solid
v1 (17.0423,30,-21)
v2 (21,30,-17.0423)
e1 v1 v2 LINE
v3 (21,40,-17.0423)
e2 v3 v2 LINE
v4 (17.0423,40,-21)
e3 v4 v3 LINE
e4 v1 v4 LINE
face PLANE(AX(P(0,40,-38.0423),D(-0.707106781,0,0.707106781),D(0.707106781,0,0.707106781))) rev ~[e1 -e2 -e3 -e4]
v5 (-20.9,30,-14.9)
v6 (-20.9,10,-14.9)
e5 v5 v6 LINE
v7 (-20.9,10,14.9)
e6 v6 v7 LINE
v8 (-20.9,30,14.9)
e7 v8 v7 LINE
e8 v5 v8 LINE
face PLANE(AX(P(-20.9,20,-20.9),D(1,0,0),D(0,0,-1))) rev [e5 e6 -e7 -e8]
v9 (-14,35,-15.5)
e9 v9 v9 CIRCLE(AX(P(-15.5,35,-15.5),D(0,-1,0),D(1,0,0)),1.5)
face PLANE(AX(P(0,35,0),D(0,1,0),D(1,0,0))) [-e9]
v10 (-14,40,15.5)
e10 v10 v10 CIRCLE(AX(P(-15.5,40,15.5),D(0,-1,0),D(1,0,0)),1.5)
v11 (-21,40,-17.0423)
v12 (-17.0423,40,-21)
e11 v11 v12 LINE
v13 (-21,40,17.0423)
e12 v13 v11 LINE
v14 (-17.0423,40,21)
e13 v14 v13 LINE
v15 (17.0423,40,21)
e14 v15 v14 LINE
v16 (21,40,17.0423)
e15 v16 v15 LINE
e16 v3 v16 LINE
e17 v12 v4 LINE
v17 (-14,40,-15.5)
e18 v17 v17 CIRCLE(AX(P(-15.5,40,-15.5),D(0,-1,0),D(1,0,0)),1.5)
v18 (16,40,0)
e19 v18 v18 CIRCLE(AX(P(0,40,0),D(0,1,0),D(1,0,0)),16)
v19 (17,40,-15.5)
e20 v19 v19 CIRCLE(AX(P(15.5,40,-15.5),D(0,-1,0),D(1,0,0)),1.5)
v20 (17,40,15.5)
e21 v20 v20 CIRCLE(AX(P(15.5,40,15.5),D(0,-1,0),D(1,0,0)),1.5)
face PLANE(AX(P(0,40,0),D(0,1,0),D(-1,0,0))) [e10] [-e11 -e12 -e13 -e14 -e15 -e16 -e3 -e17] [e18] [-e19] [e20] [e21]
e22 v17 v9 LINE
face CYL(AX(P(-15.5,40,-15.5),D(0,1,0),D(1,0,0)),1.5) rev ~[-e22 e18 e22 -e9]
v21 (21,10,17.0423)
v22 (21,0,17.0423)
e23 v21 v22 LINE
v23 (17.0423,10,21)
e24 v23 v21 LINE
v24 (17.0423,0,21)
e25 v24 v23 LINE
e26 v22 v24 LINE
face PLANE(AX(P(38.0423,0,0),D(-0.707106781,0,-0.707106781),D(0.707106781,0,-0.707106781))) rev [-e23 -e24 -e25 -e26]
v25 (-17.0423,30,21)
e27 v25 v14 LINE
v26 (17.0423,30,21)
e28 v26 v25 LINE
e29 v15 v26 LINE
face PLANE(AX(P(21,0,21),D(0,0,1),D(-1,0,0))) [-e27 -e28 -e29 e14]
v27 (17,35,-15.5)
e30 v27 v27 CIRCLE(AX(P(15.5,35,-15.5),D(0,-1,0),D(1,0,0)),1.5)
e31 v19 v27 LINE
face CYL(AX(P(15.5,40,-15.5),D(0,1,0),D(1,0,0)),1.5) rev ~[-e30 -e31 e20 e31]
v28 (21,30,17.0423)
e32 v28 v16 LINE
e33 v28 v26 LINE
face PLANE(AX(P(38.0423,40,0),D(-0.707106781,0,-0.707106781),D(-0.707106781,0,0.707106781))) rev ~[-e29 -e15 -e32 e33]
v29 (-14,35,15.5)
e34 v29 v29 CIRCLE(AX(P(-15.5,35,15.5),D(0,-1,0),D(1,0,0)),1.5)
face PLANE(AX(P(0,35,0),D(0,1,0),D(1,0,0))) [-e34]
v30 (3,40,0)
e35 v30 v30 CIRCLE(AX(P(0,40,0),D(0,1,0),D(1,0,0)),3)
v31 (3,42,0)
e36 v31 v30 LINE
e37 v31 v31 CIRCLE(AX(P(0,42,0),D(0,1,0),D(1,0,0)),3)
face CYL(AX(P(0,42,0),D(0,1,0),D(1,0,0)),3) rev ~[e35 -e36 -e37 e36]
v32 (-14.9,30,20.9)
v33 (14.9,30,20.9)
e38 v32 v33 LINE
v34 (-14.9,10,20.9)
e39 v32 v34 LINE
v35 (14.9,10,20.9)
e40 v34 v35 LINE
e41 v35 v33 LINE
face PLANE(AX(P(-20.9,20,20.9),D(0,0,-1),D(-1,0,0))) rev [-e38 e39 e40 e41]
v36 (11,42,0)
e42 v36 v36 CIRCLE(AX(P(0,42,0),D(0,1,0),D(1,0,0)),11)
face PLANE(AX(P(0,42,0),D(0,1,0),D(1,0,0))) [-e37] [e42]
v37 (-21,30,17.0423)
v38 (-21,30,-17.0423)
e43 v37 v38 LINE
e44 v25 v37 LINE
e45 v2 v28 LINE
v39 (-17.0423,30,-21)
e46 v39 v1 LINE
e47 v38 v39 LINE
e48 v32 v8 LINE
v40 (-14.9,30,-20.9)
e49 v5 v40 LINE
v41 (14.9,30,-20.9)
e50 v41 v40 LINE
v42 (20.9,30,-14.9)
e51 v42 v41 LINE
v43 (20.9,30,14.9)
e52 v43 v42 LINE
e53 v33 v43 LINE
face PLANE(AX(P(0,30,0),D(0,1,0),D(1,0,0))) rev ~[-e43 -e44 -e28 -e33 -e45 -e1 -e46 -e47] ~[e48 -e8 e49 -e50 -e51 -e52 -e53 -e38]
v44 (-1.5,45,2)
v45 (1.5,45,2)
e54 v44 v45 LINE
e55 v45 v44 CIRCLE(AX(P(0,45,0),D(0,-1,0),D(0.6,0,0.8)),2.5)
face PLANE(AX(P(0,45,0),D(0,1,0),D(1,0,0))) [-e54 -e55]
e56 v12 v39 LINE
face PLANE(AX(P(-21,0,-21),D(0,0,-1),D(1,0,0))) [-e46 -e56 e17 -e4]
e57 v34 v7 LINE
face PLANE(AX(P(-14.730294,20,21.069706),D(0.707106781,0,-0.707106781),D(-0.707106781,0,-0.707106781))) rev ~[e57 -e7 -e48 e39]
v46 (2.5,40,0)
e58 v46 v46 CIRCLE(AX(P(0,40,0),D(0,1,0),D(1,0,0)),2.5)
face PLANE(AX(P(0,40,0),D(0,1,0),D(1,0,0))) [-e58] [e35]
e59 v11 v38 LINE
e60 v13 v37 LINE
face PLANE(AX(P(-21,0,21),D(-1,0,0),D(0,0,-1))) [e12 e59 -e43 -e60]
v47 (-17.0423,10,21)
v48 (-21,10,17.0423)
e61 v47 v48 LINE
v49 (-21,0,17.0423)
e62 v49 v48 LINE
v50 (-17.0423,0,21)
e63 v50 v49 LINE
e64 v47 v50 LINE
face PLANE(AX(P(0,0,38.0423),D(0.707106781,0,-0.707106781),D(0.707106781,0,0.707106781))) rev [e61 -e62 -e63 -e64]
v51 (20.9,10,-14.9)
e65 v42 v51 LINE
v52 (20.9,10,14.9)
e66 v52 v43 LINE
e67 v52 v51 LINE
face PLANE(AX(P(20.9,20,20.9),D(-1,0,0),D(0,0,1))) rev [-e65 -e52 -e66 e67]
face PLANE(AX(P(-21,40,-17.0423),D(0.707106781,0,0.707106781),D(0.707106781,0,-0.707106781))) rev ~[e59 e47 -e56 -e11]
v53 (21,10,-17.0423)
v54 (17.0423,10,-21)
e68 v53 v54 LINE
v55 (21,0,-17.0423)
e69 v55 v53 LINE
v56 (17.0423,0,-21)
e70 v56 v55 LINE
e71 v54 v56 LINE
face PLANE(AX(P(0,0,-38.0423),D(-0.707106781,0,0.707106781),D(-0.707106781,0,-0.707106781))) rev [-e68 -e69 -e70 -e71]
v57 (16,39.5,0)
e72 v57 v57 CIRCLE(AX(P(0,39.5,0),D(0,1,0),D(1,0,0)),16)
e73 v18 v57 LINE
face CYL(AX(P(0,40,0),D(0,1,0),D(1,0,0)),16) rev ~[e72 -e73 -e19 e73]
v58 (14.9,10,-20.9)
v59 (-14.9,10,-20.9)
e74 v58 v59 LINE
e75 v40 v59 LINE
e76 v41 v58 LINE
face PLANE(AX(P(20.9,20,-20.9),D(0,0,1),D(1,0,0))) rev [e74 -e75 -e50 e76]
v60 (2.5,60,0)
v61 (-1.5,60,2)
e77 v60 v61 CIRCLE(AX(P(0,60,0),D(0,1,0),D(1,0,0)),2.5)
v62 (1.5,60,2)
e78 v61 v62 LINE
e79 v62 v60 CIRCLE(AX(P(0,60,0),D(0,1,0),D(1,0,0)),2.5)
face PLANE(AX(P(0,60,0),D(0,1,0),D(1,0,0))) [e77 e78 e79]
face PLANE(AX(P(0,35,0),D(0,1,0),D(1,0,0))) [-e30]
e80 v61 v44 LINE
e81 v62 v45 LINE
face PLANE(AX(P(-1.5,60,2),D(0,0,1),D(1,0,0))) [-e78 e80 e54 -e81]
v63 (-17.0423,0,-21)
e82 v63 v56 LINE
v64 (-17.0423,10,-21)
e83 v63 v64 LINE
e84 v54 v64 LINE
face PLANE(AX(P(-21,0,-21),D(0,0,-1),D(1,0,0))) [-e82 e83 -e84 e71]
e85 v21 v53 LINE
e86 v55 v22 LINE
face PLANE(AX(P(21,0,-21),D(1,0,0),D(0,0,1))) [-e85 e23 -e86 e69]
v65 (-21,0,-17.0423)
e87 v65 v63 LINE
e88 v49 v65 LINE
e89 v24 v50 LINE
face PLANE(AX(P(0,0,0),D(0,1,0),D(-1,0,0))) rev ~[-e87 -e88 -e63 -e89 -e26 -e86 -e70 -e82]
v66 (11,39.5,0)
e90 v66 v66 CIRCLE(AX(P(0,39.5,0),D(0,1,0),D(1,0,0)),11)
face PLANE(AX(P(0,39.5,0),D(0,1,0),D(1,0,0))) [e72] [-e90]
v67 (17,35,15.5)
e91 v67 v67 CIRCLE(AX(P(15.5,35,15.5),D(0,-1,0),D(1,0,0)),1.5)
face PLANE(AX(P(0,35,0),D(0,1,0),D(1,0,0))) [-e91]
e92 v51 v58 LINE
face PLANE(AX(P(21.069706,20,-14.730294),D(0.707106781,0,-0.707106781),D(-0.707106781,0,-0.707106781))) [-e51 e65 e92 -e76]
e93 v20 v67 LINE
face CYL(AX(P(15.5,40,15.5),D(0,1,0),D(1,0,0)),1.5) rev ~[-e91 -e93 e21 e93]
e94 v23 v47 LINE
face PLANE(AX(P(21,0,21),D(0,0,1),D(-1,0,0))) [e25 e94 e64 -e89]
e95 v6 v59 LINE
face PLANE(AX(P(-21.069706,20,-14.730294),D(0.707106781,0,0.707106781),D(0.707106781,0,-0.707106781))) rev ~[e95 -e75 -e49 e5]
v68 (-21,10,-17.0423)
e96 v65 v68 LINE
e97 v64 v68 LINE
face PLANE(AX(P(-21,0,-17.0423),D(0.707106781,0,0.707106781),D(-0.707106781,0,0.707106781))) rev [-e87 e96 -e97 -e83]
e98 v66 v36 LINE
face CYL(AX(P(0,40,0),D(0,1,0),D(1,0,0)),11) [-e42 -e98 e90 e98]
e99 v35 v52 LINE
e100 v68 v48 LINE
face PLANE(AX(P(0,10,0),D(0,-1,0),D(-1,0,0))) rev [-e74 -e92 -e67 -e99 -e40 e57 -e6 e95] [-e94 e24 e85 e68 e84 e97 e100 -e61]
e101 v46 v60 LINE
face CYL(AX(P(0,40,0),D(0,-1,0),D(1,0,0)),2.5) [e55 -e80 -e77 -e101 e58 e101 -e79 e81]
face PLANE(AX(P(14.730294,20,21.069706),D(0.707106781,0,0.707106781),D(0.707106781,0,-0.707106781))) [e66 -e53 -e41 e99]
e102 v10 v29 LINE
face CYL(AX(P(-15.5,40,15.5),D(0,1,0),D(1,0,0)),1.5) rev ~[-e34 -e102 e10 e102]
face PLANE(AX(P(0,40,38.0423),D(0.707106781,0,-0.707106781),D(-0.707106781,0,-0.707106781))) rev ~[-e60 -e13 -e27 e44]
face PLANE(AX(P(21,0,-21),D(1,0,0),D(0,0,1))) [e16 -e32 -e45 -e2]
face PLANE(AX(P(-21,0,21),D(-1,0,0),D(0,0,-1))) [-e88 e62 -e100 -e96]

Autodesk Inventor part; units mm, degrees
ref_plane "YZ Plane" through (0, 0, 0) normal (1, 0, 0) x (0, 1, 0)
ref_plane "XZ Plane" through (0, 0, 0) normal (0, 1, 0) x (-1, 0, 0)
sketch "Sketch1" plane through (0, 0, 0) normal (0, 1, 0) x (-1, 0, 0)
  line L0 (-21, 21) -> (21, 21)
  line L1 (21, 21) -> (21, -21)
  line L2 (21, -21) -> (-21, -21)
  line L3 (-21, -21) -> (-21, 21)
  line L4 (-21, 21) -> (21, -21) construction
  line L5 (21, 21) -> (-21, -21) construction
  point P0 (0, 0)
  dimension "d0" = 42
  dimension "d1" = 42
extrude "Extrusion1" add sketch "Sketch1" along normal blind 40
ref_plane "Work Plane1" through (0, 20, 0) normal (0, 1, 0) x (1, 0, 0)
sketch "Sketch2" plane through (0, 40, 0) normal (0, 1, 0) x (1, 0, 0)
  line L0 (0, -38.0423) -> (-38.0423, 0)
  line L1 (-38.0423, 0) -> (0, 38.0423)
  line L2 (0, 38.0423) -> (38.0423, 0)
  line L3 (38.0423, 0) -> (0, -38.0423)
  line L4 (0, -38.0423) -> (0, 38.0423) construction
  line L5 (-38.0423, 0) -> (38.0423, 0) construction
  line L6 (-21, 21) -> (-21, -21) projected
  circle A0 centre (0, 0) radius 250
  dimension "d4" = 53.8
  dimension "d5" = 53.8
  dimension "d6" = 500
extrude "Extrusion2" cut sketch "Sketch2" against normal blind 10
sketch "Sketch3" plane through (0, 20, 0) normal (0, 1, 0) x (1, 0, 0)
  line L0 (-20.9, -20.9) -> (20.9, -20.9)
  line L1 (20.9, -20.9) -> (20.9, 20.9)
  line L2 (20.9, 20.9) -> (-20.9, 20.9)
  line L3 (-20.9, 20.9) -> (-20.9, -20.9)
  line L4 (-21, -21) -> (-21, -17.0423) projected
  line L5 (21, -21) -> (17.0423, -21) projected
  line L6 (21, 21) -> (21, 17.0423) projected
  line L7 (-21, 21) -> (-17.0423, 21) projected
  circle A0 centre (0, 0) radius 200
  dimension "d9" = 0.1
  dimension "d10" = 0.1
  dimension "d11" = 0.1
  dimension "d12" = 0.1
  dimension "d13" = 400
extrude "Extrusion3" cut sketch "Sketch3" along normal up to surface (10 mm away)
chamfer "Chamfer1" distance 6 angle 45 4 edges at (20.9, 25, 20.9) (20.9, 25, -20.9) (-20.9, 25, 20.9) (-20.9, 25, -20.9)
mirror "Mirror1" about plane through (0, 20, 0) normal (0, 1, 0) of "Extrusion3", "Extrusion2", "Chamfer1"
sketch "Sketch4" plane through (0, 40, 0) normal (0, 1, 0) x (1, 0, 0)
  circle A0 centre (0, 0) radius 11
  dimension "d19" = 22
extrude "Extrusion4" add sketch "Sketch4" along normal blind 2
sketch "Sketch5" plane through (0, 40, 0) normal (0, 1, 0) x (1, 0, 0)
  circle A0 centre (0, 0) radius 11 projected
  line L0 (17.0423, -21) -> (21, -17.0423) projected
  line L1 (21, -17.0423) -> (21, 17.0423) projected
  line L2 (21, 17.0423) -> (17.0423, 21) projected
  line L3 (17.0423, 21) -> (-17.0423, 21) projected
  line L4 (-17.0423, 21) -> (-21, 17.0423) projected
  line L5 (-21, 17.0423) -> (-21, -17.0423) projected
  line L6 (-21, -17.0423) -> (-17.0423, -21) projected
  line L7 (-17.0423, -21) -> (17.0423, -21) projected
  circle A1 centre (0, 0) radius 16
  dimension "d22" = 32
extrude "Extrusion5" cut sketch "Sketch5" against normal blind 0.5 contours A1
sketch "Sketch6" plane through (0, 42, 0) normal (0, 1, 0) x (1, 0, 0)
  circle A0 centre (0, 0) radius 3
  dimension "d25" = 6
extrude "Extrusion6" cut sketch "Sketch6" against normal blind 2
sketch "Sketch8" plane through (0, 40, 0) normal (0, 1, 0) x (1, 0, 0)
  circle A0 centre (0, 0) radius 16 construction
  line L0 (17.0423, -21) -> (21, -17.0423) construction
  line L1 (21, -17.0423) -> (21, 17.0423) construction
  line L2 (21, 17.0423) -> (17.0423, 21) construction
  line L3 (17.0423, 21) -> (-17.0423, 21) construction
  line L4 (-17.0423, 21) -> (-21, 17.0423) construction
  line L5 (-21, 17.0423) -> (-21, -17.0423) construction
  line L6 (-21, -17.0423) -> (-17.0423, -21) construction
  line L7 (-17.0423, -21) -> (17.0423, -21) construction
  line L8 (-15.5, -15.5) -> (15.5, -15.5) construction
  line L9 (15.5, -15.5) -> (15.5, 15.5) construction
  line L10 (15.5, 15.5) -> (-15.5, 15.5) construction
  line L11 (-15.5, 15.5) -> (-15.5, -15.5) construction
  line L12 (-15.5, -15.5) -> (15.5, 15.5) construction
  line L13 (15.5, -15.5) -> (-15.5, 15.5) construction
  circle A1 centre (-15.5, 15.5) radius 1.5
  circle A2 centre (15.5, 15.5) radius 1.5
  circle A3 centre (15.5, -15.5) radius 1.5
  circle A4 centre (-15.5, -15.5) radius 1.5
  dimension "d36" = 31
  dimension "d37" = 31
  dimension "d38" = 3
  dimension "d39" = 3
  dimension "d40" = 3
  dimension "d41" = 3
extrude "Extrusion8" cut sketch "Sketch8" against normal blind 5
thread "Thread2" size "M3x0.5" class "6H" standard "ANSI Metric M Profile" full length
sketch "Sketch9" plane through (0, 40, 0) normal (0, 1, 0) x (1, 0, 0)
  circle A0 centre (0, 0) radius 2.5
  dimension "d49" = 5
extrude "Extrusion9" add sketch "Sketch9" along normal blind 20
pattern_circular "Circular Pattern2" count 4 over 360 about axis through (0, 40, 0) along (0, 1, 0) of "Extrusion8"
sketch "Sketch10" plane through (0, 60, 0) normal (0, 1, 0) x (1, 0, 0)
  circle A0 centre (0, 0) radius 2.5 projected
  circle A1 centre (0, 0) radius 2.5 projected
  line L0 (-1.5, -2) -> (1.5, -2)
  line L1 (1.5, -2) -> (1.5, -2.5)
  line L2 (1.5, -2.5) -> (-1.5, -2.5)
  line L3 (-1.5, -2.5) -> (-1.5, -2)
  circle A2 centre (0, 0) radius 2.5 projected
  dimension "d55" = 0.5
extrude "Extrusion10" cut sketch "Sketch10" against normal blind 15 contours L0 A0 | A0 L2 L3 | L1 L2 A0 picked at (0.3466, -2.0912)
equation "\"d9\" = d10"
equation "\"d11\" = d10"
equation "\"d12\" = d10"
properties part number "nema17_40mm"
